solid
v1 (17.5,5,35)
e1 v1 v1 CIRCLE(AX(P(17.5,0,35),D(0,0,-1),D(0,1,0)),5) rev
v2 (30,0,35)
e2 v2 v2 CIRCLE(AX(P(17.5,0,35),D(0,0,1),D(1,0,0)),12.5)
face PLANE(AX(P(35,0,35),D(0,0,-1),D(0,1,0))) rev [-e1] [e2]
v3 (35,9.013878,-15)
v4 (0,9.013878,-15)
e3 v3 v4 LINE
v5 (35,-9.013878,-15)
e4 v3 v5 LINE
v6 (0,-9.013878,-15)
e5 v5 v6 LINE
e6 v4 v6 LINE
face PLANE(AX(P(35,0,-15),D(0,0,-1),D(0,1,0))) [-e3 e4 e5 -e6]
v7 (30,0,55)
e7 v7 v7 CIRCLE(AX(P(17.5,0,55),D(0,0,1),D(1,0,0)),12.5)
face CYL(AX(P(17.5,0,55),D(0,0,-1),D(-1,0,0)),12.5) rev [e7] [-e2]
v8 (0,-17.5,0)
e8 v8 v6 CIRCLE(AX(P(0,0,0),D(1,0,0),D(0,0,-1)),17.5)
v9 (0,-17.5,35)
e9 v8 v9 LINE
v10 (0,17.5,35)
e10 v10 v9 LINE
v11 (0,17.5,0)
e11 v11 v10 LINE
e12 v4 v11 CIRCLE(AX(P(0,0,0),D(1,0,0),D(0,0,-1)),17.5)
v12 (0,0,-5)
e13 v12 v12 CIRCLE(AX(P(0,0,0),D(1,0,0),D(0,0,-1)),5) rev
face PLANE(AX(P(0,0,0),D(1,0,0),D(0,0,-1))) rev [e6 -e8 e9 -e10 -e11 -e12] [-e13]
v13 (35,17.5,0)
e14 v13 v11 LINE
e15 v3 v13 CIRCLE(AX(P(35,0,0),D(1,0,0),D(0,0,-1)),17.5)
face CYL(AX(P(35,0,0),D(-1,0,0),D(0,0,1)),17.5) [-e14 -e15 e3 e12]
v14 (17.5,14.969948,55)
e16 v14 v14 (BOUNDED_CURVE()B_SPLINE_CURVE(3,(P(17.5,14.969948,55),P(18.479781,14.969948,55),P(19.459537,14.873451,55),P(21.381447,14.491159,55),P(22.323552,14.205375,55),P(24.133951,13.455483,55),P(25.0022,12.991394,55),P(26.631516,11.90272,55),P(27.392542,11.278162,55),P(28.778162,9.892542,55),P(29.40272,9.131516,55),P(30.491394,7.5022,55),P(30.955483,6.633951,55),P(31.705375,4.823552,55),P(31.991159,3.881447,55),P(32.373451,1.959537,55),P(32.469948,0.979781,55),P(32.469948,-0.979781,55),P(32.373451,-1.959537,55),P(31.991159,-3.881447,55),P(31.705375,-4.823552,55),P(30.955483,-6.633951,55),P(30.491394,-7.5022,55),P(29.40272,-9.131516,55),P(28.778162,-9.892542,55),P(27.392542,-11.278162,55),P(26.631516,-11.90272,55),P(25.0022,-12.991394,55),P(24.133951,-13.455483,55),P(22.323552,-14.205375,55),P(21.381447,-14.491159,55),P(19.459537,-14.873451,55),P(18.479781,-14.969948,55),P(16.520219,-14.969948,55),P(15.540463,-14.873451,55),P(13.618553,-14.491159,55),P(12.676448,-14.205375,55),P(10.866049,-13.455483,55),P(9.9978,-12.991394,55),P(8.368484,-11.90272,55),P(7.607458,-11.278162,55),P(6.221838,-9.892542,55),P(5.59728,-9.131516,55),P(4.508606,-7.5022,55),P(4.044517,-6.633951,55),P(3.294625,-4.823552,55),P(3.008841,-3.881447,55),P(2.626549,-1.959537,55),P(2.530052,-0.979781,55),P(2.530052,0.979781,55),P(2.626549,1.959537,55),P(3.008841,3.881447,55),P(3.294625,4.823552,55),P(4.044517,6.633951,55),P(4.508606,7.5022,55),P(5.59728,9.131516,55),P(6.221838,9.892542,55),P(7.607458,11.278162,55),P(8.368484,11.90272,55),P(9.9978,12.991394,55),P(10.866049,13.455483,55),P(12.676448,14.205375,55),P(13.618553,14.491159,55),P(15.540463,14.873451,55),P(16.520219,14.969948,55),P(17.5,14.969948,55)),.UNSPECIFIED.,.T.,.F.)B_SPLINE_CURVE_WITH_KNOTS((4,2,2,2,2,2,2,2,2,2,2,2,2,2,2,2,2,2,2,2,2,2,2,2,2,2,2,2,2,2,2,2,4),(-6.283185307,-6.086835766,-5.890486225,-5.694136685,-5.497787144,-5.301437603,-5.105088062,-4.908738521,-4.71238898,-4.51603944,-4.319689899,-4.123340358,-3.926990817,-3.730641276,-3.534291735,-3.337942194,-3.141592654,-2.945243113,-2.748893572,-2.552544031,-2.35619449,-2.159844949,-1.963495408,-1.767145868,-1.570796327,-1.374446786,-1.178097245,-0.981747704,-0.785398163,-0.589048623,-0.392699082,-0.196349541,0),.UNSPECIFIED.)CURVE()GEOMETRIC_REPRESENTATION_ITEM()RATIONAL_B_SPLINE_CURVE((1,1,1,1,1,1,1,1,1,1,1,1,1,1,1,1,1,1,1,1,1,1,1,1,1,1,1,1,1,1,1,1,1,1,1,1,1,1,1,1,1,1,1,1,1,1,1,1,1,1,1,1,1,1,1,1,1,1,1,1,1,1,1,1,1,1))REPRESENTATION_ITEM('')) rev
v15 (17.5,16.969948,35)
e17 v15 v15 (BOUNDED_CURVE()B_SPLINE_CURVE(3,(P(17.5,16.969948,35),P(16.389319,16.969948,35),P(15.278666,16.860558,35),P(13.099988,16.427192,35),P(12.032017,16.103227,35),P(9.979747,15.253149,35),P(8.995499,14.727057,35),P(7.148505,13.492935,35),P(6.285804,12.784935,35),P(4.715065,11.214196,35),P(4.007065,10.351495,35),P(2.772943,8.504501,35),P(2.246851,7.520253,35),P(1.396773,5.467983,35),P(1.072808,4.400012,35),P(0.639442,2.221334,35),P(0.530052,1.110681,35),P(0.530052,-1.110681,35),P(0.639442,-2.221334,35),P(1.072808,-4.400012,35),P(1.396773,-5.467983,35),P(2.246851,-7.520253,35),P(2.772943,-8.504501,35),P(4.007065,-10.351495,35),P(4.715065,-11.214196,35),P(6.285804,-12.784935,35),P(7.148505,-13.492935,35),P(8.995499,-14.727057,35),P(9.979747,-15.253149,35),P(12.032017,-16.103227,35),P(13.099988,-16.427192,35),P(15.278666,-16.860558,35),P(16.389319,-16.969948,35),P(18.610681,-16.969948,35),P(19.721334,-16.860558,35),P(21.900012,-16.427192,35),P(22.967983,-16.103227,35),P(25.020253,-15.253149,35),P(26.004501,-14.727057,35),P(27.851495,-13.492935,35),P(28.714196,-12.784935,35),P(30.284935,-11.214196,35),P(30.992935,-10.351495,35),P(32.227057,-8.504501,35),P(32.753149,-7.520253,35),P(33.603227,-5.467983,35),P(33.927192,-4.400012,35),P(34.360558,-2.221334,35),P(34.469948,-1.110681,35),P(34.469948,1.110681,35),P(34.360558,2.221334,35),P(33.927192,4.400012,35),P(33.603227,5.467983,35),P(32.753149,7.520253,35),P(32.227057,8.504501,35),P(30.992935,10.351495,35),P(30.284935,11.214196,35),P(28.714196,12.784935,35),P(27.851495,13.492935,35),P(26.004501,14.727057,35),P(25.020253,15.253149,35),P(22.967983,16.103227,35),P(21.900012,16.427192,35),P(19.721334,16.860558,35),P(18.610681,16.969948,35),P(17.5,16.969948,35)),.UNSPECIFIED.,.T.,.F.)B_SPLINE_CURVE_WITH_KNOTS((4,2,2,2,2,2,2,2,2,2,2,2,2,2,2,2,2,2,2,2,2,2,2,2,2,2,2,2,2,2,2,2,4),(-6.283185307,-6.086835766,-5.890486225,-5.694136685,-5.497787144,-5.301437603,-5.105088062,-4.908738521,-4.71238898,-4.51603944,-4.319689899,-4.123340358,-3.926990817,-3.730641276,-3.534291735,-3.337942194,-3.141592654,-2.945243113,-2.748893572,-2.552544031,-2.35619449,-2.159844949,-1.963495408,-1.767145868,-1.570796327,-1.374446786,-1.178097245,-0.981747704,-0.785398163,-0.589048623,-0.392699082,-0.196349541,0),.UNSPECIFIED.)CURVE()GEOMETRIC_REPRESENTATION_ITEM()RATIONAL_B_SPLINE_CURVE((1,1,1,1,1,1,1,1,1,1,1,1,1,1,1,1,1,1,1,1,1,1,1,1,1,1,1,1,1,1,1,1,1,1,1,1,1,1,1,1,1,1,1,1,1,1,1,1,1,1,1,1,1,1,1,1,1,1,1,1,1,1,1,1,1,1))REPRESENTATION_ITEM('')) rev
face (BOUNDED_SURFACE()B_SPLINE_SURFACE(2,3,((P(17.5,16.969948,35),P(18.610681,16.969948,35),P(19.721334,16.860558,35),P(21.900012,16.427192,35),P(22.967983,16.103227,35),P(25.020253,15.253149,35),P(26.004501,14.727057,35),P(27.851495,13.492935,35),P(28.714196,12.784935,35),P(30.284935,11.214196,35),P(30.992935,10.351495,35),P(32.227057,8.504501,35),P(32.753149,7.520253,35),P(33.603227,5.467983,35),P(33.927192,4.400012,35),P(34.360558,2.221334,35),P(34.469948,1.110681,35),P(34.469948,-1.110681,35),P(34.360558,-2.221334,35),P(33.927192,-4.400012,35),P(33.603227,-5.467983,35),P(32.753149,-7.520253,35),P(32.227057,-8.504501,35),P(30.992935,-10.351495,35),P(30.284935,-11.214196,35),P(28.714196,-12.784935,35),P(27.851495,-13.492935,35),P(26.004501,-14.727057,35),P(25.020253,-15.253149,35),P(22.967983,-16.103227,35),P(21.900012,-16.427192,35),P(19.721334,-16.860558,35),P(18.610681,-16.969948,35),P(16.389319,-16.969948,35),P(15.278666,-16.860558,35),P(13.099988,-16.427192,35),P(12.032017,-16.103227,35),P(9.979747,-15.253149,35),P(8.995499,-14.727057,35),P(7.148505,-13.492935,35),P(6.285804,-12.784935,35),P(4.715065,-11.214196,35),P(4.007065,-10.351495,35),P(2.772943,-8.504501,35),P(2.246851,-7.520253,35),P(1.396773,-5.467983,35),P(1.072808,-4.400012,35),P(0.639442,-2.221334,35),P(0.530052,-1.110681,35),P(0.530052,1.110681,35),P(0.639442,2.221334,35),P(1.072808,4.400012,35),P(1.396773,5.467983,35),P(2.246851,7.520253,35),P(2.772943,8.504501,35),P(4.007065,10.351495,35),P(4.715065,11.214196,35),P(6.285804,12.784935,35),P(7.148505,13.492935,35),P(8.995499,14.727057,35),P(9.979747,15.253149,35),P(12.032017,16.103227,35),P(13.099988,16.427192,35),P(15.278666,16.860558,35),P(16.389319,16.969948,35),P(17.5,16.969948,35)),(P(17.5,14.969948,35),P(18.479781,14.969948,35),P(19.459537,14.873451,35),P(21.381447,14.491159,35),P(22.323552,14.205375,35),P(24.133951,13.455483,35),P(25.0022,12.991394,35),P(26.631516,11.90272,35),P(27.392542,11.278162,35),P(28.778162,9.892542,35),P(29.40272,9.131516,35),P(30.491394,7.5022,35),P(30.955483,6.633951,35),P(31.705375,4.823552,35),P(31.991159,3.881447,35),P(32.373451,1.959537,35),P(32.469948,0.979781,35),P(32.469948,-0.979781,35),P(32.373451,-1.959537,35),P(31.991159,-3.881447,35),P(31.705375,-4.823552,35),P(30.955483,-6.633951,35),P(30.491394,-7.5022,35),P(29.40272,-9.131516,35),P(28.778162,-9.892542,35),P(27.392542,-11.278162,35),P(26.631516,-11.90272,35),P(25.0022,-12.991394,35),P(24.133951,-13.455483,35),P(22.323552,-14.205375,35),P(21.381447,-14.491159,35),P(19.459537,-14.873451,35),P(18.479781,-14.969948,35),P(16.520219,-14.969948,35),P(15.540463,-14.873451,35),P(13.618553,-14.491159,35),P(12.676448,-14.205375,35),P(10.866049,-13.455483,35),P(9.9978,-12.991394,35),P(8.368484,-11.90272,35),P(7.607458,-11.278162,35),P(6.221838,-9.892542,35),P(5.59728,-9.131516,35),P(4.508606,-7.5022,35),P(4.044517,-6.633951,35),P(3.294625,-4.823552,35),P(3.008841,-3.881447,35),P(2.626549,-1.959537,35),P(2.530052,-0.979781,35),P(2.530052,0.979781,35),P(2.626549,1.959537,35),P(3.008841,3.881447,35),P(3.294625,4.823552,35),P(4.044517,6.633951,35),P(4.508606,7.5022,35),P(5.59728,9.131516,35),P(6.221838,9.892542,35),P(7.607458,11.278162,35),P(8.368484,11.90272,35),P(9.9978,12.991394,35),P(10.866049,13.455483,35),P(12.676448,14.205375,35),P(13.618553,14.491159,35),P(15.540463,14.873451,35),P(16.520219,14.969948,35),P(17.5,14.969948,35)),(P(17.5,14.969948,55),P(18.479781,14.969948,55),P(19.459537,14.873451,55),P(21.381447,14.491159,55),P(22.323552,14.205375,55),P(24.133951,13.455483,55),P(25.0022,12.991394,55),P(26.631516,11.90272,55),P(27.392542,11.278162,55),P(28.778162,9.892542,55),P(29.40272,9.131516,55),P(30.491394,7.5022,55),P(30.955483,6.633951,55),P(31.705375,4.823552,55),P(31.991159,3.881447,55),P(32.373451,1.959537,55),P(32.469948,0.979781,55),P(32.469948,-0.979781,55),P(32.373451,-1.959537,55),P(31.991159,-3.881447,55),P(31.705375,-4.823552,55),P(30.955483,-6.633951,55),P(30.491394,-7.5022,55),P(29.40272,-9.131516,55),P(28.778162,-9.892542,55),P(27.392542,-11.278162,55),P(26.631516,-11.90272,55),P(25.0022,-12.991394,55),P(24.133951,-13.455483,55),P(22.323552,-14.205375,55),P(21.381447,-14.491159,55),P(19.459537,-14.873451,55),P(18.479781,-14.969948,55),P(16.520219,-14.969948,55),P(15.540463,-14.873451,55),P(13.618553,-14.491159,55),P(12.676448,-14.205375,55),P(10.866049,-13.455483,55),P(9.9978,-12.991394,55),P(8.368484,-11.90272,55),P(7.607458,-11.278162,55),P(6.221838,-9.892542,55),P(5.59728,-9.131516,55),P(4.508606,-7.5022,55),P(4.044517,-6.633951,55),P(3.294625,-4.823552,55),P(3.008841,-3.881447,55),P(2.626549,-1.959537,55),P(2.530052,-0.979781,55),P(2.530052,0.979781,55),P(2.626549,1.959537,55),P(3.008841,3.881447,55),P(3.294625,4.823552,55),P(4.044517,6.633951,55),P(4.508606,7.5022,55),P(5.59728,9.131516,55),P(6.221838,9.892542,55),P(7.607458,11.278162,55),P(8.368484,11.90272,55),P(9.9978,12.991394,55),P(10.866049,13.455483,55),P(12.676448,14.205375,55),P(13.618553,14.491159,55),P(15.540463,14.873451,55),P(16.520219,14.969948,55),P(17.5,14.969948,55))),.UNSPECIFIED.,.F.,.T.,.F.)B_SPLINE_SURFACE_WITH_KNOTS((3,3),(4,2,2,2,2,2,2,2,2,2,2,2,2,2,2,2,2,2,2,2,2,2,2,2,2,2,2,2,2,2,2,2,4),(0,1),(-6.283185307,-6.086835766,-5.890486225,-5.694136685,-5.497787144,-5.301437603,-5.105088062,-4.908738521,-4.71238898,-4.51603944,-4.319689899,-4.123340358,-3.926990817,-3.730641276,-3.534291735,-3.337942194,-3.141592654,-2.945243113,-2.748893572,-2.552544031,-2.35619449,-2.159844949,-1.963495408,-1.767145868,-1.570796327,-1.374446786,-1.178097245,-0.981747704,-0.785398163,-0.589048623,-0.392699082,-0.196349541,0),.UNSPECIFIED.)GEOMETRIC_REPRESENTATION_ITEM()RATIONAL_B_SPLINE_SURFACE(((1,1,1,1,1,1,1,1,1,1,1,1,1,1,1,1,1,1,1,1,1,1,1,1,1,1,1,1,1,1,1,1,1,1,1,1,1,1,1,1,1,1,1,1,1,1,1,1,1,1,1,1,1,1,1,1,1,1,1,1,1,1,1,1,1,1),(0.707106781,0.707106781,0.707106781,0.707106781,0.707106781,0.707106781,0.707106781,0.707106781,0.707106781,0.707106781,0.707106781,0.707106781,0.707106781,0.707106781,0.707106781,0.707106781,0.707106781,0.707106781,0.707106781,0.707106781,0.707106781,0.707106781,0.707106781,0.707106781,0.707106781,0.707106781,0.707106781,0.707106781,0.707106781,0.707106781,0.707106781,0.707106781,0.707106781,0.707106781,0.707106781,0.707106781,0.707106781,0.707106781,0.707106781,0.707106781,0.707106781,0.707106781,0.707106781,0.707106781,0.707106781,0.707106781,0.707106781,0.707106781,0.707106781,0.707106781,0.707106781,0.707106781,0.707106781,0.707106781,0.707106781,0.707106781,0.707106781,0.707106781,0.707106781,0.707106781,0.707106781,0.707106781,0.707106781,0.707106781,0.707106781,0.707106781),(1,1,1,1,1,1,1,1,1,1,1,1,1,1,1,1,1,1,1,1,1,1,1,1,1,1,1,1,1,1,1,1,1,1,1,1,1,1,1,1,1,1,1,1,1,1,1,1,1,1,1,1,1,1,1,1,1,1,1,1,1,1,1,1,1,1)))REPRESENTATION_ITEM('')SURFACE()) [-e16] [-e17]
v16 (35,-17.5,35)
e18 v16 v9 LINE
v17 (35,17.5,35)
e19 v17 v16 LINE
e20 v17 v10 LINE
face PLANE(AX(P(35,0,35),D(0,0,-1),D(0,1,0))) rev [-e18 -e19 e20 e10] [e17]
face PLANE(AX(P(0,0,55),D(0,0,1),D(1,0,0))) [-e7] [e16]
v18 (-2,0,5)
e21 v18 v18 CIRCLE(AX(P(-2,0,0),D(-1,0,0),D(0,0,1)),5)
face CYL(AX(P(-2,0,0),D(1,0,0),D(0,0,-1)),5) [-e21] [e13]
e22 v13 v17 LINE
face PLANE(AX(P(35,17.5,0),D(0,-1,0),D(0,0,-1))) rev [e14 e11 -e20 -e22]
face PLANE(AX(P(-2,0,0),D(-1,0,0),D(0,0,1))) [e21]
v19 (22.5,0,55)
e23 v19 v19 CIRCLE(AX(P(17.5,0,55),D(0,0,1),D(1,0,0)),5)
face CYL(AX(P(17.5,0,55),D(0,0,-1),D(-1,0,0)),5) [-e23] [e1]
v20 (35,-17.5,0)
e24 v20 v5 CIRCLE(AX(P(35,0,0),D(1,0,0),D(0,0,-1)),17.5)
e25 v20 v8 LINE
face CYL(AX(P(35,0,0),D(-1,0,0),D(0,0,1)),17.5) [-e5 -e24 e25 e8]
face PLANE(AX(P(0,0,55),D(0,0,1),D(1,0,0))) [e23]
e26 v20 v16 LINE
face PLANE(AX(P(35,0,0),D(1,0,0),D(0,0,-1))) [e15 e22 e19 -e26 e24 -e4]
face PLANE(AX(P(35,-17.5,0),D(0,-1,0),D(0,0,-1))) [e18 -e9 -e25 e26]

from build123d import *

# Parameters (mm, degrees)
AUFSATZ_LINEAR_AUSTRAGEN1_DEPTH = 35
SKIZZE3_R                       = 14.969948268
SKIZZE3_R_2                     = 12.5
SKIZZE3_R_3                     = 5
AUFSATZ_LINEAR_AUSTRAGEN2_DEPTH = 20
VERRUNDUNG1_SIZE                = 2
VERRUNDUNG1_SIZE_2              = 20
SKIZZE4_R                       = 5
AUFSATZ_LINEAR_AUSTRAGEN3_DEPTH = 2


with BuildPart() as part:
    # Skizze2 → Aufsatz-Linear austragen1 (new body)
    with BuildSketch(Plane(origin=(0, 0, 0), x_dir=(0, 0, -1), z_dir=(1, 0, 0))):
        with BuildLine():
            Line((-35, -17.5), (3.5e-08, -17.5))
            ThreePointArc((3.5e-08, -17.5), (8.617050894, -15.231429148), (15, -9.013878189))
            Line((15, -9.013878189), (15, 9.013878189))
            ThreePointArc((15, 9.013878189), (8.61705092, 15.231429133), (9.5e-08, 17.5))
            Line((9.5e-08, 17.5), (-35, 17.5))
            Line((-35, 17.5), (-35, -17.5))
        make_face()
    extrude(amount=AUFSATZ_LINEAR_AUSTRAGEN1_DEPTH)

    # Skizze3 → Aufsatz-Linear austragen2 (add)
    # profile 1 of 2: a face of its own
    with BuildSketch(Plane.XY.offset(35)):
        with Locations(Location((17.5, 0, 0), (0, 0, 90))):
            Circle(SKIZZE3_R)
        with Locations((17.5, 0)):
            Circle(SKIZZE3_R_2, mode=Mode.SUBTRACT)
    # profile 2 of 2: a face of its own
    with BuildSketch(Plane.XY.offset(35)):
        with Locations(Location((17.5, 0, 0), (0, 0, 90))):
            Circle(SKIZZE3_R_3)
    extrude(amount=AUFSATZ_LINEAR_AUSTRAGEN2_DEPTH)

    # Verrundung1
    # an asymmetric fillet: 20, 2 mm, written as the material it adds along each edge
    with BuildSketch(Plane(origin=(17.5, 0, 35), x_dir=(0, 1, 0), z_dir=(1, 0, 0))) as verrundung1_piece_1:
        with BuildLine():
            Bezier((14.969948268 + VERRUNDUNG1_SIZE, 0), (14.969948268, 0), (14.969948268, VERRUNDUNG1_SIZE_2), weights=[1, 0.707106781, 1])
            Line((14.969948268, VERRUNDUNG1_SIZE_2), (14.969948268, 0))
            Line((14.969948268, 0), (14.969948268 + VERRUNDUNG1_SIZE, 0))
        make_face()
    revolve(axis=Axis((17.5, 0, 35), (0, 0, 1)))

    # Skizze4 → Aufsatz-Linear austragen3 (add)
    with BuildSketch(Plane.ZY):
        with Locations(Location((0, 0, 0), (0, 0, 180))):
            Circle(SKIZZE4_R)
    extrude(amount=AUFSATZ_LINEAR_AUSTRAGEN3_DEPTH)


solid = part.part
